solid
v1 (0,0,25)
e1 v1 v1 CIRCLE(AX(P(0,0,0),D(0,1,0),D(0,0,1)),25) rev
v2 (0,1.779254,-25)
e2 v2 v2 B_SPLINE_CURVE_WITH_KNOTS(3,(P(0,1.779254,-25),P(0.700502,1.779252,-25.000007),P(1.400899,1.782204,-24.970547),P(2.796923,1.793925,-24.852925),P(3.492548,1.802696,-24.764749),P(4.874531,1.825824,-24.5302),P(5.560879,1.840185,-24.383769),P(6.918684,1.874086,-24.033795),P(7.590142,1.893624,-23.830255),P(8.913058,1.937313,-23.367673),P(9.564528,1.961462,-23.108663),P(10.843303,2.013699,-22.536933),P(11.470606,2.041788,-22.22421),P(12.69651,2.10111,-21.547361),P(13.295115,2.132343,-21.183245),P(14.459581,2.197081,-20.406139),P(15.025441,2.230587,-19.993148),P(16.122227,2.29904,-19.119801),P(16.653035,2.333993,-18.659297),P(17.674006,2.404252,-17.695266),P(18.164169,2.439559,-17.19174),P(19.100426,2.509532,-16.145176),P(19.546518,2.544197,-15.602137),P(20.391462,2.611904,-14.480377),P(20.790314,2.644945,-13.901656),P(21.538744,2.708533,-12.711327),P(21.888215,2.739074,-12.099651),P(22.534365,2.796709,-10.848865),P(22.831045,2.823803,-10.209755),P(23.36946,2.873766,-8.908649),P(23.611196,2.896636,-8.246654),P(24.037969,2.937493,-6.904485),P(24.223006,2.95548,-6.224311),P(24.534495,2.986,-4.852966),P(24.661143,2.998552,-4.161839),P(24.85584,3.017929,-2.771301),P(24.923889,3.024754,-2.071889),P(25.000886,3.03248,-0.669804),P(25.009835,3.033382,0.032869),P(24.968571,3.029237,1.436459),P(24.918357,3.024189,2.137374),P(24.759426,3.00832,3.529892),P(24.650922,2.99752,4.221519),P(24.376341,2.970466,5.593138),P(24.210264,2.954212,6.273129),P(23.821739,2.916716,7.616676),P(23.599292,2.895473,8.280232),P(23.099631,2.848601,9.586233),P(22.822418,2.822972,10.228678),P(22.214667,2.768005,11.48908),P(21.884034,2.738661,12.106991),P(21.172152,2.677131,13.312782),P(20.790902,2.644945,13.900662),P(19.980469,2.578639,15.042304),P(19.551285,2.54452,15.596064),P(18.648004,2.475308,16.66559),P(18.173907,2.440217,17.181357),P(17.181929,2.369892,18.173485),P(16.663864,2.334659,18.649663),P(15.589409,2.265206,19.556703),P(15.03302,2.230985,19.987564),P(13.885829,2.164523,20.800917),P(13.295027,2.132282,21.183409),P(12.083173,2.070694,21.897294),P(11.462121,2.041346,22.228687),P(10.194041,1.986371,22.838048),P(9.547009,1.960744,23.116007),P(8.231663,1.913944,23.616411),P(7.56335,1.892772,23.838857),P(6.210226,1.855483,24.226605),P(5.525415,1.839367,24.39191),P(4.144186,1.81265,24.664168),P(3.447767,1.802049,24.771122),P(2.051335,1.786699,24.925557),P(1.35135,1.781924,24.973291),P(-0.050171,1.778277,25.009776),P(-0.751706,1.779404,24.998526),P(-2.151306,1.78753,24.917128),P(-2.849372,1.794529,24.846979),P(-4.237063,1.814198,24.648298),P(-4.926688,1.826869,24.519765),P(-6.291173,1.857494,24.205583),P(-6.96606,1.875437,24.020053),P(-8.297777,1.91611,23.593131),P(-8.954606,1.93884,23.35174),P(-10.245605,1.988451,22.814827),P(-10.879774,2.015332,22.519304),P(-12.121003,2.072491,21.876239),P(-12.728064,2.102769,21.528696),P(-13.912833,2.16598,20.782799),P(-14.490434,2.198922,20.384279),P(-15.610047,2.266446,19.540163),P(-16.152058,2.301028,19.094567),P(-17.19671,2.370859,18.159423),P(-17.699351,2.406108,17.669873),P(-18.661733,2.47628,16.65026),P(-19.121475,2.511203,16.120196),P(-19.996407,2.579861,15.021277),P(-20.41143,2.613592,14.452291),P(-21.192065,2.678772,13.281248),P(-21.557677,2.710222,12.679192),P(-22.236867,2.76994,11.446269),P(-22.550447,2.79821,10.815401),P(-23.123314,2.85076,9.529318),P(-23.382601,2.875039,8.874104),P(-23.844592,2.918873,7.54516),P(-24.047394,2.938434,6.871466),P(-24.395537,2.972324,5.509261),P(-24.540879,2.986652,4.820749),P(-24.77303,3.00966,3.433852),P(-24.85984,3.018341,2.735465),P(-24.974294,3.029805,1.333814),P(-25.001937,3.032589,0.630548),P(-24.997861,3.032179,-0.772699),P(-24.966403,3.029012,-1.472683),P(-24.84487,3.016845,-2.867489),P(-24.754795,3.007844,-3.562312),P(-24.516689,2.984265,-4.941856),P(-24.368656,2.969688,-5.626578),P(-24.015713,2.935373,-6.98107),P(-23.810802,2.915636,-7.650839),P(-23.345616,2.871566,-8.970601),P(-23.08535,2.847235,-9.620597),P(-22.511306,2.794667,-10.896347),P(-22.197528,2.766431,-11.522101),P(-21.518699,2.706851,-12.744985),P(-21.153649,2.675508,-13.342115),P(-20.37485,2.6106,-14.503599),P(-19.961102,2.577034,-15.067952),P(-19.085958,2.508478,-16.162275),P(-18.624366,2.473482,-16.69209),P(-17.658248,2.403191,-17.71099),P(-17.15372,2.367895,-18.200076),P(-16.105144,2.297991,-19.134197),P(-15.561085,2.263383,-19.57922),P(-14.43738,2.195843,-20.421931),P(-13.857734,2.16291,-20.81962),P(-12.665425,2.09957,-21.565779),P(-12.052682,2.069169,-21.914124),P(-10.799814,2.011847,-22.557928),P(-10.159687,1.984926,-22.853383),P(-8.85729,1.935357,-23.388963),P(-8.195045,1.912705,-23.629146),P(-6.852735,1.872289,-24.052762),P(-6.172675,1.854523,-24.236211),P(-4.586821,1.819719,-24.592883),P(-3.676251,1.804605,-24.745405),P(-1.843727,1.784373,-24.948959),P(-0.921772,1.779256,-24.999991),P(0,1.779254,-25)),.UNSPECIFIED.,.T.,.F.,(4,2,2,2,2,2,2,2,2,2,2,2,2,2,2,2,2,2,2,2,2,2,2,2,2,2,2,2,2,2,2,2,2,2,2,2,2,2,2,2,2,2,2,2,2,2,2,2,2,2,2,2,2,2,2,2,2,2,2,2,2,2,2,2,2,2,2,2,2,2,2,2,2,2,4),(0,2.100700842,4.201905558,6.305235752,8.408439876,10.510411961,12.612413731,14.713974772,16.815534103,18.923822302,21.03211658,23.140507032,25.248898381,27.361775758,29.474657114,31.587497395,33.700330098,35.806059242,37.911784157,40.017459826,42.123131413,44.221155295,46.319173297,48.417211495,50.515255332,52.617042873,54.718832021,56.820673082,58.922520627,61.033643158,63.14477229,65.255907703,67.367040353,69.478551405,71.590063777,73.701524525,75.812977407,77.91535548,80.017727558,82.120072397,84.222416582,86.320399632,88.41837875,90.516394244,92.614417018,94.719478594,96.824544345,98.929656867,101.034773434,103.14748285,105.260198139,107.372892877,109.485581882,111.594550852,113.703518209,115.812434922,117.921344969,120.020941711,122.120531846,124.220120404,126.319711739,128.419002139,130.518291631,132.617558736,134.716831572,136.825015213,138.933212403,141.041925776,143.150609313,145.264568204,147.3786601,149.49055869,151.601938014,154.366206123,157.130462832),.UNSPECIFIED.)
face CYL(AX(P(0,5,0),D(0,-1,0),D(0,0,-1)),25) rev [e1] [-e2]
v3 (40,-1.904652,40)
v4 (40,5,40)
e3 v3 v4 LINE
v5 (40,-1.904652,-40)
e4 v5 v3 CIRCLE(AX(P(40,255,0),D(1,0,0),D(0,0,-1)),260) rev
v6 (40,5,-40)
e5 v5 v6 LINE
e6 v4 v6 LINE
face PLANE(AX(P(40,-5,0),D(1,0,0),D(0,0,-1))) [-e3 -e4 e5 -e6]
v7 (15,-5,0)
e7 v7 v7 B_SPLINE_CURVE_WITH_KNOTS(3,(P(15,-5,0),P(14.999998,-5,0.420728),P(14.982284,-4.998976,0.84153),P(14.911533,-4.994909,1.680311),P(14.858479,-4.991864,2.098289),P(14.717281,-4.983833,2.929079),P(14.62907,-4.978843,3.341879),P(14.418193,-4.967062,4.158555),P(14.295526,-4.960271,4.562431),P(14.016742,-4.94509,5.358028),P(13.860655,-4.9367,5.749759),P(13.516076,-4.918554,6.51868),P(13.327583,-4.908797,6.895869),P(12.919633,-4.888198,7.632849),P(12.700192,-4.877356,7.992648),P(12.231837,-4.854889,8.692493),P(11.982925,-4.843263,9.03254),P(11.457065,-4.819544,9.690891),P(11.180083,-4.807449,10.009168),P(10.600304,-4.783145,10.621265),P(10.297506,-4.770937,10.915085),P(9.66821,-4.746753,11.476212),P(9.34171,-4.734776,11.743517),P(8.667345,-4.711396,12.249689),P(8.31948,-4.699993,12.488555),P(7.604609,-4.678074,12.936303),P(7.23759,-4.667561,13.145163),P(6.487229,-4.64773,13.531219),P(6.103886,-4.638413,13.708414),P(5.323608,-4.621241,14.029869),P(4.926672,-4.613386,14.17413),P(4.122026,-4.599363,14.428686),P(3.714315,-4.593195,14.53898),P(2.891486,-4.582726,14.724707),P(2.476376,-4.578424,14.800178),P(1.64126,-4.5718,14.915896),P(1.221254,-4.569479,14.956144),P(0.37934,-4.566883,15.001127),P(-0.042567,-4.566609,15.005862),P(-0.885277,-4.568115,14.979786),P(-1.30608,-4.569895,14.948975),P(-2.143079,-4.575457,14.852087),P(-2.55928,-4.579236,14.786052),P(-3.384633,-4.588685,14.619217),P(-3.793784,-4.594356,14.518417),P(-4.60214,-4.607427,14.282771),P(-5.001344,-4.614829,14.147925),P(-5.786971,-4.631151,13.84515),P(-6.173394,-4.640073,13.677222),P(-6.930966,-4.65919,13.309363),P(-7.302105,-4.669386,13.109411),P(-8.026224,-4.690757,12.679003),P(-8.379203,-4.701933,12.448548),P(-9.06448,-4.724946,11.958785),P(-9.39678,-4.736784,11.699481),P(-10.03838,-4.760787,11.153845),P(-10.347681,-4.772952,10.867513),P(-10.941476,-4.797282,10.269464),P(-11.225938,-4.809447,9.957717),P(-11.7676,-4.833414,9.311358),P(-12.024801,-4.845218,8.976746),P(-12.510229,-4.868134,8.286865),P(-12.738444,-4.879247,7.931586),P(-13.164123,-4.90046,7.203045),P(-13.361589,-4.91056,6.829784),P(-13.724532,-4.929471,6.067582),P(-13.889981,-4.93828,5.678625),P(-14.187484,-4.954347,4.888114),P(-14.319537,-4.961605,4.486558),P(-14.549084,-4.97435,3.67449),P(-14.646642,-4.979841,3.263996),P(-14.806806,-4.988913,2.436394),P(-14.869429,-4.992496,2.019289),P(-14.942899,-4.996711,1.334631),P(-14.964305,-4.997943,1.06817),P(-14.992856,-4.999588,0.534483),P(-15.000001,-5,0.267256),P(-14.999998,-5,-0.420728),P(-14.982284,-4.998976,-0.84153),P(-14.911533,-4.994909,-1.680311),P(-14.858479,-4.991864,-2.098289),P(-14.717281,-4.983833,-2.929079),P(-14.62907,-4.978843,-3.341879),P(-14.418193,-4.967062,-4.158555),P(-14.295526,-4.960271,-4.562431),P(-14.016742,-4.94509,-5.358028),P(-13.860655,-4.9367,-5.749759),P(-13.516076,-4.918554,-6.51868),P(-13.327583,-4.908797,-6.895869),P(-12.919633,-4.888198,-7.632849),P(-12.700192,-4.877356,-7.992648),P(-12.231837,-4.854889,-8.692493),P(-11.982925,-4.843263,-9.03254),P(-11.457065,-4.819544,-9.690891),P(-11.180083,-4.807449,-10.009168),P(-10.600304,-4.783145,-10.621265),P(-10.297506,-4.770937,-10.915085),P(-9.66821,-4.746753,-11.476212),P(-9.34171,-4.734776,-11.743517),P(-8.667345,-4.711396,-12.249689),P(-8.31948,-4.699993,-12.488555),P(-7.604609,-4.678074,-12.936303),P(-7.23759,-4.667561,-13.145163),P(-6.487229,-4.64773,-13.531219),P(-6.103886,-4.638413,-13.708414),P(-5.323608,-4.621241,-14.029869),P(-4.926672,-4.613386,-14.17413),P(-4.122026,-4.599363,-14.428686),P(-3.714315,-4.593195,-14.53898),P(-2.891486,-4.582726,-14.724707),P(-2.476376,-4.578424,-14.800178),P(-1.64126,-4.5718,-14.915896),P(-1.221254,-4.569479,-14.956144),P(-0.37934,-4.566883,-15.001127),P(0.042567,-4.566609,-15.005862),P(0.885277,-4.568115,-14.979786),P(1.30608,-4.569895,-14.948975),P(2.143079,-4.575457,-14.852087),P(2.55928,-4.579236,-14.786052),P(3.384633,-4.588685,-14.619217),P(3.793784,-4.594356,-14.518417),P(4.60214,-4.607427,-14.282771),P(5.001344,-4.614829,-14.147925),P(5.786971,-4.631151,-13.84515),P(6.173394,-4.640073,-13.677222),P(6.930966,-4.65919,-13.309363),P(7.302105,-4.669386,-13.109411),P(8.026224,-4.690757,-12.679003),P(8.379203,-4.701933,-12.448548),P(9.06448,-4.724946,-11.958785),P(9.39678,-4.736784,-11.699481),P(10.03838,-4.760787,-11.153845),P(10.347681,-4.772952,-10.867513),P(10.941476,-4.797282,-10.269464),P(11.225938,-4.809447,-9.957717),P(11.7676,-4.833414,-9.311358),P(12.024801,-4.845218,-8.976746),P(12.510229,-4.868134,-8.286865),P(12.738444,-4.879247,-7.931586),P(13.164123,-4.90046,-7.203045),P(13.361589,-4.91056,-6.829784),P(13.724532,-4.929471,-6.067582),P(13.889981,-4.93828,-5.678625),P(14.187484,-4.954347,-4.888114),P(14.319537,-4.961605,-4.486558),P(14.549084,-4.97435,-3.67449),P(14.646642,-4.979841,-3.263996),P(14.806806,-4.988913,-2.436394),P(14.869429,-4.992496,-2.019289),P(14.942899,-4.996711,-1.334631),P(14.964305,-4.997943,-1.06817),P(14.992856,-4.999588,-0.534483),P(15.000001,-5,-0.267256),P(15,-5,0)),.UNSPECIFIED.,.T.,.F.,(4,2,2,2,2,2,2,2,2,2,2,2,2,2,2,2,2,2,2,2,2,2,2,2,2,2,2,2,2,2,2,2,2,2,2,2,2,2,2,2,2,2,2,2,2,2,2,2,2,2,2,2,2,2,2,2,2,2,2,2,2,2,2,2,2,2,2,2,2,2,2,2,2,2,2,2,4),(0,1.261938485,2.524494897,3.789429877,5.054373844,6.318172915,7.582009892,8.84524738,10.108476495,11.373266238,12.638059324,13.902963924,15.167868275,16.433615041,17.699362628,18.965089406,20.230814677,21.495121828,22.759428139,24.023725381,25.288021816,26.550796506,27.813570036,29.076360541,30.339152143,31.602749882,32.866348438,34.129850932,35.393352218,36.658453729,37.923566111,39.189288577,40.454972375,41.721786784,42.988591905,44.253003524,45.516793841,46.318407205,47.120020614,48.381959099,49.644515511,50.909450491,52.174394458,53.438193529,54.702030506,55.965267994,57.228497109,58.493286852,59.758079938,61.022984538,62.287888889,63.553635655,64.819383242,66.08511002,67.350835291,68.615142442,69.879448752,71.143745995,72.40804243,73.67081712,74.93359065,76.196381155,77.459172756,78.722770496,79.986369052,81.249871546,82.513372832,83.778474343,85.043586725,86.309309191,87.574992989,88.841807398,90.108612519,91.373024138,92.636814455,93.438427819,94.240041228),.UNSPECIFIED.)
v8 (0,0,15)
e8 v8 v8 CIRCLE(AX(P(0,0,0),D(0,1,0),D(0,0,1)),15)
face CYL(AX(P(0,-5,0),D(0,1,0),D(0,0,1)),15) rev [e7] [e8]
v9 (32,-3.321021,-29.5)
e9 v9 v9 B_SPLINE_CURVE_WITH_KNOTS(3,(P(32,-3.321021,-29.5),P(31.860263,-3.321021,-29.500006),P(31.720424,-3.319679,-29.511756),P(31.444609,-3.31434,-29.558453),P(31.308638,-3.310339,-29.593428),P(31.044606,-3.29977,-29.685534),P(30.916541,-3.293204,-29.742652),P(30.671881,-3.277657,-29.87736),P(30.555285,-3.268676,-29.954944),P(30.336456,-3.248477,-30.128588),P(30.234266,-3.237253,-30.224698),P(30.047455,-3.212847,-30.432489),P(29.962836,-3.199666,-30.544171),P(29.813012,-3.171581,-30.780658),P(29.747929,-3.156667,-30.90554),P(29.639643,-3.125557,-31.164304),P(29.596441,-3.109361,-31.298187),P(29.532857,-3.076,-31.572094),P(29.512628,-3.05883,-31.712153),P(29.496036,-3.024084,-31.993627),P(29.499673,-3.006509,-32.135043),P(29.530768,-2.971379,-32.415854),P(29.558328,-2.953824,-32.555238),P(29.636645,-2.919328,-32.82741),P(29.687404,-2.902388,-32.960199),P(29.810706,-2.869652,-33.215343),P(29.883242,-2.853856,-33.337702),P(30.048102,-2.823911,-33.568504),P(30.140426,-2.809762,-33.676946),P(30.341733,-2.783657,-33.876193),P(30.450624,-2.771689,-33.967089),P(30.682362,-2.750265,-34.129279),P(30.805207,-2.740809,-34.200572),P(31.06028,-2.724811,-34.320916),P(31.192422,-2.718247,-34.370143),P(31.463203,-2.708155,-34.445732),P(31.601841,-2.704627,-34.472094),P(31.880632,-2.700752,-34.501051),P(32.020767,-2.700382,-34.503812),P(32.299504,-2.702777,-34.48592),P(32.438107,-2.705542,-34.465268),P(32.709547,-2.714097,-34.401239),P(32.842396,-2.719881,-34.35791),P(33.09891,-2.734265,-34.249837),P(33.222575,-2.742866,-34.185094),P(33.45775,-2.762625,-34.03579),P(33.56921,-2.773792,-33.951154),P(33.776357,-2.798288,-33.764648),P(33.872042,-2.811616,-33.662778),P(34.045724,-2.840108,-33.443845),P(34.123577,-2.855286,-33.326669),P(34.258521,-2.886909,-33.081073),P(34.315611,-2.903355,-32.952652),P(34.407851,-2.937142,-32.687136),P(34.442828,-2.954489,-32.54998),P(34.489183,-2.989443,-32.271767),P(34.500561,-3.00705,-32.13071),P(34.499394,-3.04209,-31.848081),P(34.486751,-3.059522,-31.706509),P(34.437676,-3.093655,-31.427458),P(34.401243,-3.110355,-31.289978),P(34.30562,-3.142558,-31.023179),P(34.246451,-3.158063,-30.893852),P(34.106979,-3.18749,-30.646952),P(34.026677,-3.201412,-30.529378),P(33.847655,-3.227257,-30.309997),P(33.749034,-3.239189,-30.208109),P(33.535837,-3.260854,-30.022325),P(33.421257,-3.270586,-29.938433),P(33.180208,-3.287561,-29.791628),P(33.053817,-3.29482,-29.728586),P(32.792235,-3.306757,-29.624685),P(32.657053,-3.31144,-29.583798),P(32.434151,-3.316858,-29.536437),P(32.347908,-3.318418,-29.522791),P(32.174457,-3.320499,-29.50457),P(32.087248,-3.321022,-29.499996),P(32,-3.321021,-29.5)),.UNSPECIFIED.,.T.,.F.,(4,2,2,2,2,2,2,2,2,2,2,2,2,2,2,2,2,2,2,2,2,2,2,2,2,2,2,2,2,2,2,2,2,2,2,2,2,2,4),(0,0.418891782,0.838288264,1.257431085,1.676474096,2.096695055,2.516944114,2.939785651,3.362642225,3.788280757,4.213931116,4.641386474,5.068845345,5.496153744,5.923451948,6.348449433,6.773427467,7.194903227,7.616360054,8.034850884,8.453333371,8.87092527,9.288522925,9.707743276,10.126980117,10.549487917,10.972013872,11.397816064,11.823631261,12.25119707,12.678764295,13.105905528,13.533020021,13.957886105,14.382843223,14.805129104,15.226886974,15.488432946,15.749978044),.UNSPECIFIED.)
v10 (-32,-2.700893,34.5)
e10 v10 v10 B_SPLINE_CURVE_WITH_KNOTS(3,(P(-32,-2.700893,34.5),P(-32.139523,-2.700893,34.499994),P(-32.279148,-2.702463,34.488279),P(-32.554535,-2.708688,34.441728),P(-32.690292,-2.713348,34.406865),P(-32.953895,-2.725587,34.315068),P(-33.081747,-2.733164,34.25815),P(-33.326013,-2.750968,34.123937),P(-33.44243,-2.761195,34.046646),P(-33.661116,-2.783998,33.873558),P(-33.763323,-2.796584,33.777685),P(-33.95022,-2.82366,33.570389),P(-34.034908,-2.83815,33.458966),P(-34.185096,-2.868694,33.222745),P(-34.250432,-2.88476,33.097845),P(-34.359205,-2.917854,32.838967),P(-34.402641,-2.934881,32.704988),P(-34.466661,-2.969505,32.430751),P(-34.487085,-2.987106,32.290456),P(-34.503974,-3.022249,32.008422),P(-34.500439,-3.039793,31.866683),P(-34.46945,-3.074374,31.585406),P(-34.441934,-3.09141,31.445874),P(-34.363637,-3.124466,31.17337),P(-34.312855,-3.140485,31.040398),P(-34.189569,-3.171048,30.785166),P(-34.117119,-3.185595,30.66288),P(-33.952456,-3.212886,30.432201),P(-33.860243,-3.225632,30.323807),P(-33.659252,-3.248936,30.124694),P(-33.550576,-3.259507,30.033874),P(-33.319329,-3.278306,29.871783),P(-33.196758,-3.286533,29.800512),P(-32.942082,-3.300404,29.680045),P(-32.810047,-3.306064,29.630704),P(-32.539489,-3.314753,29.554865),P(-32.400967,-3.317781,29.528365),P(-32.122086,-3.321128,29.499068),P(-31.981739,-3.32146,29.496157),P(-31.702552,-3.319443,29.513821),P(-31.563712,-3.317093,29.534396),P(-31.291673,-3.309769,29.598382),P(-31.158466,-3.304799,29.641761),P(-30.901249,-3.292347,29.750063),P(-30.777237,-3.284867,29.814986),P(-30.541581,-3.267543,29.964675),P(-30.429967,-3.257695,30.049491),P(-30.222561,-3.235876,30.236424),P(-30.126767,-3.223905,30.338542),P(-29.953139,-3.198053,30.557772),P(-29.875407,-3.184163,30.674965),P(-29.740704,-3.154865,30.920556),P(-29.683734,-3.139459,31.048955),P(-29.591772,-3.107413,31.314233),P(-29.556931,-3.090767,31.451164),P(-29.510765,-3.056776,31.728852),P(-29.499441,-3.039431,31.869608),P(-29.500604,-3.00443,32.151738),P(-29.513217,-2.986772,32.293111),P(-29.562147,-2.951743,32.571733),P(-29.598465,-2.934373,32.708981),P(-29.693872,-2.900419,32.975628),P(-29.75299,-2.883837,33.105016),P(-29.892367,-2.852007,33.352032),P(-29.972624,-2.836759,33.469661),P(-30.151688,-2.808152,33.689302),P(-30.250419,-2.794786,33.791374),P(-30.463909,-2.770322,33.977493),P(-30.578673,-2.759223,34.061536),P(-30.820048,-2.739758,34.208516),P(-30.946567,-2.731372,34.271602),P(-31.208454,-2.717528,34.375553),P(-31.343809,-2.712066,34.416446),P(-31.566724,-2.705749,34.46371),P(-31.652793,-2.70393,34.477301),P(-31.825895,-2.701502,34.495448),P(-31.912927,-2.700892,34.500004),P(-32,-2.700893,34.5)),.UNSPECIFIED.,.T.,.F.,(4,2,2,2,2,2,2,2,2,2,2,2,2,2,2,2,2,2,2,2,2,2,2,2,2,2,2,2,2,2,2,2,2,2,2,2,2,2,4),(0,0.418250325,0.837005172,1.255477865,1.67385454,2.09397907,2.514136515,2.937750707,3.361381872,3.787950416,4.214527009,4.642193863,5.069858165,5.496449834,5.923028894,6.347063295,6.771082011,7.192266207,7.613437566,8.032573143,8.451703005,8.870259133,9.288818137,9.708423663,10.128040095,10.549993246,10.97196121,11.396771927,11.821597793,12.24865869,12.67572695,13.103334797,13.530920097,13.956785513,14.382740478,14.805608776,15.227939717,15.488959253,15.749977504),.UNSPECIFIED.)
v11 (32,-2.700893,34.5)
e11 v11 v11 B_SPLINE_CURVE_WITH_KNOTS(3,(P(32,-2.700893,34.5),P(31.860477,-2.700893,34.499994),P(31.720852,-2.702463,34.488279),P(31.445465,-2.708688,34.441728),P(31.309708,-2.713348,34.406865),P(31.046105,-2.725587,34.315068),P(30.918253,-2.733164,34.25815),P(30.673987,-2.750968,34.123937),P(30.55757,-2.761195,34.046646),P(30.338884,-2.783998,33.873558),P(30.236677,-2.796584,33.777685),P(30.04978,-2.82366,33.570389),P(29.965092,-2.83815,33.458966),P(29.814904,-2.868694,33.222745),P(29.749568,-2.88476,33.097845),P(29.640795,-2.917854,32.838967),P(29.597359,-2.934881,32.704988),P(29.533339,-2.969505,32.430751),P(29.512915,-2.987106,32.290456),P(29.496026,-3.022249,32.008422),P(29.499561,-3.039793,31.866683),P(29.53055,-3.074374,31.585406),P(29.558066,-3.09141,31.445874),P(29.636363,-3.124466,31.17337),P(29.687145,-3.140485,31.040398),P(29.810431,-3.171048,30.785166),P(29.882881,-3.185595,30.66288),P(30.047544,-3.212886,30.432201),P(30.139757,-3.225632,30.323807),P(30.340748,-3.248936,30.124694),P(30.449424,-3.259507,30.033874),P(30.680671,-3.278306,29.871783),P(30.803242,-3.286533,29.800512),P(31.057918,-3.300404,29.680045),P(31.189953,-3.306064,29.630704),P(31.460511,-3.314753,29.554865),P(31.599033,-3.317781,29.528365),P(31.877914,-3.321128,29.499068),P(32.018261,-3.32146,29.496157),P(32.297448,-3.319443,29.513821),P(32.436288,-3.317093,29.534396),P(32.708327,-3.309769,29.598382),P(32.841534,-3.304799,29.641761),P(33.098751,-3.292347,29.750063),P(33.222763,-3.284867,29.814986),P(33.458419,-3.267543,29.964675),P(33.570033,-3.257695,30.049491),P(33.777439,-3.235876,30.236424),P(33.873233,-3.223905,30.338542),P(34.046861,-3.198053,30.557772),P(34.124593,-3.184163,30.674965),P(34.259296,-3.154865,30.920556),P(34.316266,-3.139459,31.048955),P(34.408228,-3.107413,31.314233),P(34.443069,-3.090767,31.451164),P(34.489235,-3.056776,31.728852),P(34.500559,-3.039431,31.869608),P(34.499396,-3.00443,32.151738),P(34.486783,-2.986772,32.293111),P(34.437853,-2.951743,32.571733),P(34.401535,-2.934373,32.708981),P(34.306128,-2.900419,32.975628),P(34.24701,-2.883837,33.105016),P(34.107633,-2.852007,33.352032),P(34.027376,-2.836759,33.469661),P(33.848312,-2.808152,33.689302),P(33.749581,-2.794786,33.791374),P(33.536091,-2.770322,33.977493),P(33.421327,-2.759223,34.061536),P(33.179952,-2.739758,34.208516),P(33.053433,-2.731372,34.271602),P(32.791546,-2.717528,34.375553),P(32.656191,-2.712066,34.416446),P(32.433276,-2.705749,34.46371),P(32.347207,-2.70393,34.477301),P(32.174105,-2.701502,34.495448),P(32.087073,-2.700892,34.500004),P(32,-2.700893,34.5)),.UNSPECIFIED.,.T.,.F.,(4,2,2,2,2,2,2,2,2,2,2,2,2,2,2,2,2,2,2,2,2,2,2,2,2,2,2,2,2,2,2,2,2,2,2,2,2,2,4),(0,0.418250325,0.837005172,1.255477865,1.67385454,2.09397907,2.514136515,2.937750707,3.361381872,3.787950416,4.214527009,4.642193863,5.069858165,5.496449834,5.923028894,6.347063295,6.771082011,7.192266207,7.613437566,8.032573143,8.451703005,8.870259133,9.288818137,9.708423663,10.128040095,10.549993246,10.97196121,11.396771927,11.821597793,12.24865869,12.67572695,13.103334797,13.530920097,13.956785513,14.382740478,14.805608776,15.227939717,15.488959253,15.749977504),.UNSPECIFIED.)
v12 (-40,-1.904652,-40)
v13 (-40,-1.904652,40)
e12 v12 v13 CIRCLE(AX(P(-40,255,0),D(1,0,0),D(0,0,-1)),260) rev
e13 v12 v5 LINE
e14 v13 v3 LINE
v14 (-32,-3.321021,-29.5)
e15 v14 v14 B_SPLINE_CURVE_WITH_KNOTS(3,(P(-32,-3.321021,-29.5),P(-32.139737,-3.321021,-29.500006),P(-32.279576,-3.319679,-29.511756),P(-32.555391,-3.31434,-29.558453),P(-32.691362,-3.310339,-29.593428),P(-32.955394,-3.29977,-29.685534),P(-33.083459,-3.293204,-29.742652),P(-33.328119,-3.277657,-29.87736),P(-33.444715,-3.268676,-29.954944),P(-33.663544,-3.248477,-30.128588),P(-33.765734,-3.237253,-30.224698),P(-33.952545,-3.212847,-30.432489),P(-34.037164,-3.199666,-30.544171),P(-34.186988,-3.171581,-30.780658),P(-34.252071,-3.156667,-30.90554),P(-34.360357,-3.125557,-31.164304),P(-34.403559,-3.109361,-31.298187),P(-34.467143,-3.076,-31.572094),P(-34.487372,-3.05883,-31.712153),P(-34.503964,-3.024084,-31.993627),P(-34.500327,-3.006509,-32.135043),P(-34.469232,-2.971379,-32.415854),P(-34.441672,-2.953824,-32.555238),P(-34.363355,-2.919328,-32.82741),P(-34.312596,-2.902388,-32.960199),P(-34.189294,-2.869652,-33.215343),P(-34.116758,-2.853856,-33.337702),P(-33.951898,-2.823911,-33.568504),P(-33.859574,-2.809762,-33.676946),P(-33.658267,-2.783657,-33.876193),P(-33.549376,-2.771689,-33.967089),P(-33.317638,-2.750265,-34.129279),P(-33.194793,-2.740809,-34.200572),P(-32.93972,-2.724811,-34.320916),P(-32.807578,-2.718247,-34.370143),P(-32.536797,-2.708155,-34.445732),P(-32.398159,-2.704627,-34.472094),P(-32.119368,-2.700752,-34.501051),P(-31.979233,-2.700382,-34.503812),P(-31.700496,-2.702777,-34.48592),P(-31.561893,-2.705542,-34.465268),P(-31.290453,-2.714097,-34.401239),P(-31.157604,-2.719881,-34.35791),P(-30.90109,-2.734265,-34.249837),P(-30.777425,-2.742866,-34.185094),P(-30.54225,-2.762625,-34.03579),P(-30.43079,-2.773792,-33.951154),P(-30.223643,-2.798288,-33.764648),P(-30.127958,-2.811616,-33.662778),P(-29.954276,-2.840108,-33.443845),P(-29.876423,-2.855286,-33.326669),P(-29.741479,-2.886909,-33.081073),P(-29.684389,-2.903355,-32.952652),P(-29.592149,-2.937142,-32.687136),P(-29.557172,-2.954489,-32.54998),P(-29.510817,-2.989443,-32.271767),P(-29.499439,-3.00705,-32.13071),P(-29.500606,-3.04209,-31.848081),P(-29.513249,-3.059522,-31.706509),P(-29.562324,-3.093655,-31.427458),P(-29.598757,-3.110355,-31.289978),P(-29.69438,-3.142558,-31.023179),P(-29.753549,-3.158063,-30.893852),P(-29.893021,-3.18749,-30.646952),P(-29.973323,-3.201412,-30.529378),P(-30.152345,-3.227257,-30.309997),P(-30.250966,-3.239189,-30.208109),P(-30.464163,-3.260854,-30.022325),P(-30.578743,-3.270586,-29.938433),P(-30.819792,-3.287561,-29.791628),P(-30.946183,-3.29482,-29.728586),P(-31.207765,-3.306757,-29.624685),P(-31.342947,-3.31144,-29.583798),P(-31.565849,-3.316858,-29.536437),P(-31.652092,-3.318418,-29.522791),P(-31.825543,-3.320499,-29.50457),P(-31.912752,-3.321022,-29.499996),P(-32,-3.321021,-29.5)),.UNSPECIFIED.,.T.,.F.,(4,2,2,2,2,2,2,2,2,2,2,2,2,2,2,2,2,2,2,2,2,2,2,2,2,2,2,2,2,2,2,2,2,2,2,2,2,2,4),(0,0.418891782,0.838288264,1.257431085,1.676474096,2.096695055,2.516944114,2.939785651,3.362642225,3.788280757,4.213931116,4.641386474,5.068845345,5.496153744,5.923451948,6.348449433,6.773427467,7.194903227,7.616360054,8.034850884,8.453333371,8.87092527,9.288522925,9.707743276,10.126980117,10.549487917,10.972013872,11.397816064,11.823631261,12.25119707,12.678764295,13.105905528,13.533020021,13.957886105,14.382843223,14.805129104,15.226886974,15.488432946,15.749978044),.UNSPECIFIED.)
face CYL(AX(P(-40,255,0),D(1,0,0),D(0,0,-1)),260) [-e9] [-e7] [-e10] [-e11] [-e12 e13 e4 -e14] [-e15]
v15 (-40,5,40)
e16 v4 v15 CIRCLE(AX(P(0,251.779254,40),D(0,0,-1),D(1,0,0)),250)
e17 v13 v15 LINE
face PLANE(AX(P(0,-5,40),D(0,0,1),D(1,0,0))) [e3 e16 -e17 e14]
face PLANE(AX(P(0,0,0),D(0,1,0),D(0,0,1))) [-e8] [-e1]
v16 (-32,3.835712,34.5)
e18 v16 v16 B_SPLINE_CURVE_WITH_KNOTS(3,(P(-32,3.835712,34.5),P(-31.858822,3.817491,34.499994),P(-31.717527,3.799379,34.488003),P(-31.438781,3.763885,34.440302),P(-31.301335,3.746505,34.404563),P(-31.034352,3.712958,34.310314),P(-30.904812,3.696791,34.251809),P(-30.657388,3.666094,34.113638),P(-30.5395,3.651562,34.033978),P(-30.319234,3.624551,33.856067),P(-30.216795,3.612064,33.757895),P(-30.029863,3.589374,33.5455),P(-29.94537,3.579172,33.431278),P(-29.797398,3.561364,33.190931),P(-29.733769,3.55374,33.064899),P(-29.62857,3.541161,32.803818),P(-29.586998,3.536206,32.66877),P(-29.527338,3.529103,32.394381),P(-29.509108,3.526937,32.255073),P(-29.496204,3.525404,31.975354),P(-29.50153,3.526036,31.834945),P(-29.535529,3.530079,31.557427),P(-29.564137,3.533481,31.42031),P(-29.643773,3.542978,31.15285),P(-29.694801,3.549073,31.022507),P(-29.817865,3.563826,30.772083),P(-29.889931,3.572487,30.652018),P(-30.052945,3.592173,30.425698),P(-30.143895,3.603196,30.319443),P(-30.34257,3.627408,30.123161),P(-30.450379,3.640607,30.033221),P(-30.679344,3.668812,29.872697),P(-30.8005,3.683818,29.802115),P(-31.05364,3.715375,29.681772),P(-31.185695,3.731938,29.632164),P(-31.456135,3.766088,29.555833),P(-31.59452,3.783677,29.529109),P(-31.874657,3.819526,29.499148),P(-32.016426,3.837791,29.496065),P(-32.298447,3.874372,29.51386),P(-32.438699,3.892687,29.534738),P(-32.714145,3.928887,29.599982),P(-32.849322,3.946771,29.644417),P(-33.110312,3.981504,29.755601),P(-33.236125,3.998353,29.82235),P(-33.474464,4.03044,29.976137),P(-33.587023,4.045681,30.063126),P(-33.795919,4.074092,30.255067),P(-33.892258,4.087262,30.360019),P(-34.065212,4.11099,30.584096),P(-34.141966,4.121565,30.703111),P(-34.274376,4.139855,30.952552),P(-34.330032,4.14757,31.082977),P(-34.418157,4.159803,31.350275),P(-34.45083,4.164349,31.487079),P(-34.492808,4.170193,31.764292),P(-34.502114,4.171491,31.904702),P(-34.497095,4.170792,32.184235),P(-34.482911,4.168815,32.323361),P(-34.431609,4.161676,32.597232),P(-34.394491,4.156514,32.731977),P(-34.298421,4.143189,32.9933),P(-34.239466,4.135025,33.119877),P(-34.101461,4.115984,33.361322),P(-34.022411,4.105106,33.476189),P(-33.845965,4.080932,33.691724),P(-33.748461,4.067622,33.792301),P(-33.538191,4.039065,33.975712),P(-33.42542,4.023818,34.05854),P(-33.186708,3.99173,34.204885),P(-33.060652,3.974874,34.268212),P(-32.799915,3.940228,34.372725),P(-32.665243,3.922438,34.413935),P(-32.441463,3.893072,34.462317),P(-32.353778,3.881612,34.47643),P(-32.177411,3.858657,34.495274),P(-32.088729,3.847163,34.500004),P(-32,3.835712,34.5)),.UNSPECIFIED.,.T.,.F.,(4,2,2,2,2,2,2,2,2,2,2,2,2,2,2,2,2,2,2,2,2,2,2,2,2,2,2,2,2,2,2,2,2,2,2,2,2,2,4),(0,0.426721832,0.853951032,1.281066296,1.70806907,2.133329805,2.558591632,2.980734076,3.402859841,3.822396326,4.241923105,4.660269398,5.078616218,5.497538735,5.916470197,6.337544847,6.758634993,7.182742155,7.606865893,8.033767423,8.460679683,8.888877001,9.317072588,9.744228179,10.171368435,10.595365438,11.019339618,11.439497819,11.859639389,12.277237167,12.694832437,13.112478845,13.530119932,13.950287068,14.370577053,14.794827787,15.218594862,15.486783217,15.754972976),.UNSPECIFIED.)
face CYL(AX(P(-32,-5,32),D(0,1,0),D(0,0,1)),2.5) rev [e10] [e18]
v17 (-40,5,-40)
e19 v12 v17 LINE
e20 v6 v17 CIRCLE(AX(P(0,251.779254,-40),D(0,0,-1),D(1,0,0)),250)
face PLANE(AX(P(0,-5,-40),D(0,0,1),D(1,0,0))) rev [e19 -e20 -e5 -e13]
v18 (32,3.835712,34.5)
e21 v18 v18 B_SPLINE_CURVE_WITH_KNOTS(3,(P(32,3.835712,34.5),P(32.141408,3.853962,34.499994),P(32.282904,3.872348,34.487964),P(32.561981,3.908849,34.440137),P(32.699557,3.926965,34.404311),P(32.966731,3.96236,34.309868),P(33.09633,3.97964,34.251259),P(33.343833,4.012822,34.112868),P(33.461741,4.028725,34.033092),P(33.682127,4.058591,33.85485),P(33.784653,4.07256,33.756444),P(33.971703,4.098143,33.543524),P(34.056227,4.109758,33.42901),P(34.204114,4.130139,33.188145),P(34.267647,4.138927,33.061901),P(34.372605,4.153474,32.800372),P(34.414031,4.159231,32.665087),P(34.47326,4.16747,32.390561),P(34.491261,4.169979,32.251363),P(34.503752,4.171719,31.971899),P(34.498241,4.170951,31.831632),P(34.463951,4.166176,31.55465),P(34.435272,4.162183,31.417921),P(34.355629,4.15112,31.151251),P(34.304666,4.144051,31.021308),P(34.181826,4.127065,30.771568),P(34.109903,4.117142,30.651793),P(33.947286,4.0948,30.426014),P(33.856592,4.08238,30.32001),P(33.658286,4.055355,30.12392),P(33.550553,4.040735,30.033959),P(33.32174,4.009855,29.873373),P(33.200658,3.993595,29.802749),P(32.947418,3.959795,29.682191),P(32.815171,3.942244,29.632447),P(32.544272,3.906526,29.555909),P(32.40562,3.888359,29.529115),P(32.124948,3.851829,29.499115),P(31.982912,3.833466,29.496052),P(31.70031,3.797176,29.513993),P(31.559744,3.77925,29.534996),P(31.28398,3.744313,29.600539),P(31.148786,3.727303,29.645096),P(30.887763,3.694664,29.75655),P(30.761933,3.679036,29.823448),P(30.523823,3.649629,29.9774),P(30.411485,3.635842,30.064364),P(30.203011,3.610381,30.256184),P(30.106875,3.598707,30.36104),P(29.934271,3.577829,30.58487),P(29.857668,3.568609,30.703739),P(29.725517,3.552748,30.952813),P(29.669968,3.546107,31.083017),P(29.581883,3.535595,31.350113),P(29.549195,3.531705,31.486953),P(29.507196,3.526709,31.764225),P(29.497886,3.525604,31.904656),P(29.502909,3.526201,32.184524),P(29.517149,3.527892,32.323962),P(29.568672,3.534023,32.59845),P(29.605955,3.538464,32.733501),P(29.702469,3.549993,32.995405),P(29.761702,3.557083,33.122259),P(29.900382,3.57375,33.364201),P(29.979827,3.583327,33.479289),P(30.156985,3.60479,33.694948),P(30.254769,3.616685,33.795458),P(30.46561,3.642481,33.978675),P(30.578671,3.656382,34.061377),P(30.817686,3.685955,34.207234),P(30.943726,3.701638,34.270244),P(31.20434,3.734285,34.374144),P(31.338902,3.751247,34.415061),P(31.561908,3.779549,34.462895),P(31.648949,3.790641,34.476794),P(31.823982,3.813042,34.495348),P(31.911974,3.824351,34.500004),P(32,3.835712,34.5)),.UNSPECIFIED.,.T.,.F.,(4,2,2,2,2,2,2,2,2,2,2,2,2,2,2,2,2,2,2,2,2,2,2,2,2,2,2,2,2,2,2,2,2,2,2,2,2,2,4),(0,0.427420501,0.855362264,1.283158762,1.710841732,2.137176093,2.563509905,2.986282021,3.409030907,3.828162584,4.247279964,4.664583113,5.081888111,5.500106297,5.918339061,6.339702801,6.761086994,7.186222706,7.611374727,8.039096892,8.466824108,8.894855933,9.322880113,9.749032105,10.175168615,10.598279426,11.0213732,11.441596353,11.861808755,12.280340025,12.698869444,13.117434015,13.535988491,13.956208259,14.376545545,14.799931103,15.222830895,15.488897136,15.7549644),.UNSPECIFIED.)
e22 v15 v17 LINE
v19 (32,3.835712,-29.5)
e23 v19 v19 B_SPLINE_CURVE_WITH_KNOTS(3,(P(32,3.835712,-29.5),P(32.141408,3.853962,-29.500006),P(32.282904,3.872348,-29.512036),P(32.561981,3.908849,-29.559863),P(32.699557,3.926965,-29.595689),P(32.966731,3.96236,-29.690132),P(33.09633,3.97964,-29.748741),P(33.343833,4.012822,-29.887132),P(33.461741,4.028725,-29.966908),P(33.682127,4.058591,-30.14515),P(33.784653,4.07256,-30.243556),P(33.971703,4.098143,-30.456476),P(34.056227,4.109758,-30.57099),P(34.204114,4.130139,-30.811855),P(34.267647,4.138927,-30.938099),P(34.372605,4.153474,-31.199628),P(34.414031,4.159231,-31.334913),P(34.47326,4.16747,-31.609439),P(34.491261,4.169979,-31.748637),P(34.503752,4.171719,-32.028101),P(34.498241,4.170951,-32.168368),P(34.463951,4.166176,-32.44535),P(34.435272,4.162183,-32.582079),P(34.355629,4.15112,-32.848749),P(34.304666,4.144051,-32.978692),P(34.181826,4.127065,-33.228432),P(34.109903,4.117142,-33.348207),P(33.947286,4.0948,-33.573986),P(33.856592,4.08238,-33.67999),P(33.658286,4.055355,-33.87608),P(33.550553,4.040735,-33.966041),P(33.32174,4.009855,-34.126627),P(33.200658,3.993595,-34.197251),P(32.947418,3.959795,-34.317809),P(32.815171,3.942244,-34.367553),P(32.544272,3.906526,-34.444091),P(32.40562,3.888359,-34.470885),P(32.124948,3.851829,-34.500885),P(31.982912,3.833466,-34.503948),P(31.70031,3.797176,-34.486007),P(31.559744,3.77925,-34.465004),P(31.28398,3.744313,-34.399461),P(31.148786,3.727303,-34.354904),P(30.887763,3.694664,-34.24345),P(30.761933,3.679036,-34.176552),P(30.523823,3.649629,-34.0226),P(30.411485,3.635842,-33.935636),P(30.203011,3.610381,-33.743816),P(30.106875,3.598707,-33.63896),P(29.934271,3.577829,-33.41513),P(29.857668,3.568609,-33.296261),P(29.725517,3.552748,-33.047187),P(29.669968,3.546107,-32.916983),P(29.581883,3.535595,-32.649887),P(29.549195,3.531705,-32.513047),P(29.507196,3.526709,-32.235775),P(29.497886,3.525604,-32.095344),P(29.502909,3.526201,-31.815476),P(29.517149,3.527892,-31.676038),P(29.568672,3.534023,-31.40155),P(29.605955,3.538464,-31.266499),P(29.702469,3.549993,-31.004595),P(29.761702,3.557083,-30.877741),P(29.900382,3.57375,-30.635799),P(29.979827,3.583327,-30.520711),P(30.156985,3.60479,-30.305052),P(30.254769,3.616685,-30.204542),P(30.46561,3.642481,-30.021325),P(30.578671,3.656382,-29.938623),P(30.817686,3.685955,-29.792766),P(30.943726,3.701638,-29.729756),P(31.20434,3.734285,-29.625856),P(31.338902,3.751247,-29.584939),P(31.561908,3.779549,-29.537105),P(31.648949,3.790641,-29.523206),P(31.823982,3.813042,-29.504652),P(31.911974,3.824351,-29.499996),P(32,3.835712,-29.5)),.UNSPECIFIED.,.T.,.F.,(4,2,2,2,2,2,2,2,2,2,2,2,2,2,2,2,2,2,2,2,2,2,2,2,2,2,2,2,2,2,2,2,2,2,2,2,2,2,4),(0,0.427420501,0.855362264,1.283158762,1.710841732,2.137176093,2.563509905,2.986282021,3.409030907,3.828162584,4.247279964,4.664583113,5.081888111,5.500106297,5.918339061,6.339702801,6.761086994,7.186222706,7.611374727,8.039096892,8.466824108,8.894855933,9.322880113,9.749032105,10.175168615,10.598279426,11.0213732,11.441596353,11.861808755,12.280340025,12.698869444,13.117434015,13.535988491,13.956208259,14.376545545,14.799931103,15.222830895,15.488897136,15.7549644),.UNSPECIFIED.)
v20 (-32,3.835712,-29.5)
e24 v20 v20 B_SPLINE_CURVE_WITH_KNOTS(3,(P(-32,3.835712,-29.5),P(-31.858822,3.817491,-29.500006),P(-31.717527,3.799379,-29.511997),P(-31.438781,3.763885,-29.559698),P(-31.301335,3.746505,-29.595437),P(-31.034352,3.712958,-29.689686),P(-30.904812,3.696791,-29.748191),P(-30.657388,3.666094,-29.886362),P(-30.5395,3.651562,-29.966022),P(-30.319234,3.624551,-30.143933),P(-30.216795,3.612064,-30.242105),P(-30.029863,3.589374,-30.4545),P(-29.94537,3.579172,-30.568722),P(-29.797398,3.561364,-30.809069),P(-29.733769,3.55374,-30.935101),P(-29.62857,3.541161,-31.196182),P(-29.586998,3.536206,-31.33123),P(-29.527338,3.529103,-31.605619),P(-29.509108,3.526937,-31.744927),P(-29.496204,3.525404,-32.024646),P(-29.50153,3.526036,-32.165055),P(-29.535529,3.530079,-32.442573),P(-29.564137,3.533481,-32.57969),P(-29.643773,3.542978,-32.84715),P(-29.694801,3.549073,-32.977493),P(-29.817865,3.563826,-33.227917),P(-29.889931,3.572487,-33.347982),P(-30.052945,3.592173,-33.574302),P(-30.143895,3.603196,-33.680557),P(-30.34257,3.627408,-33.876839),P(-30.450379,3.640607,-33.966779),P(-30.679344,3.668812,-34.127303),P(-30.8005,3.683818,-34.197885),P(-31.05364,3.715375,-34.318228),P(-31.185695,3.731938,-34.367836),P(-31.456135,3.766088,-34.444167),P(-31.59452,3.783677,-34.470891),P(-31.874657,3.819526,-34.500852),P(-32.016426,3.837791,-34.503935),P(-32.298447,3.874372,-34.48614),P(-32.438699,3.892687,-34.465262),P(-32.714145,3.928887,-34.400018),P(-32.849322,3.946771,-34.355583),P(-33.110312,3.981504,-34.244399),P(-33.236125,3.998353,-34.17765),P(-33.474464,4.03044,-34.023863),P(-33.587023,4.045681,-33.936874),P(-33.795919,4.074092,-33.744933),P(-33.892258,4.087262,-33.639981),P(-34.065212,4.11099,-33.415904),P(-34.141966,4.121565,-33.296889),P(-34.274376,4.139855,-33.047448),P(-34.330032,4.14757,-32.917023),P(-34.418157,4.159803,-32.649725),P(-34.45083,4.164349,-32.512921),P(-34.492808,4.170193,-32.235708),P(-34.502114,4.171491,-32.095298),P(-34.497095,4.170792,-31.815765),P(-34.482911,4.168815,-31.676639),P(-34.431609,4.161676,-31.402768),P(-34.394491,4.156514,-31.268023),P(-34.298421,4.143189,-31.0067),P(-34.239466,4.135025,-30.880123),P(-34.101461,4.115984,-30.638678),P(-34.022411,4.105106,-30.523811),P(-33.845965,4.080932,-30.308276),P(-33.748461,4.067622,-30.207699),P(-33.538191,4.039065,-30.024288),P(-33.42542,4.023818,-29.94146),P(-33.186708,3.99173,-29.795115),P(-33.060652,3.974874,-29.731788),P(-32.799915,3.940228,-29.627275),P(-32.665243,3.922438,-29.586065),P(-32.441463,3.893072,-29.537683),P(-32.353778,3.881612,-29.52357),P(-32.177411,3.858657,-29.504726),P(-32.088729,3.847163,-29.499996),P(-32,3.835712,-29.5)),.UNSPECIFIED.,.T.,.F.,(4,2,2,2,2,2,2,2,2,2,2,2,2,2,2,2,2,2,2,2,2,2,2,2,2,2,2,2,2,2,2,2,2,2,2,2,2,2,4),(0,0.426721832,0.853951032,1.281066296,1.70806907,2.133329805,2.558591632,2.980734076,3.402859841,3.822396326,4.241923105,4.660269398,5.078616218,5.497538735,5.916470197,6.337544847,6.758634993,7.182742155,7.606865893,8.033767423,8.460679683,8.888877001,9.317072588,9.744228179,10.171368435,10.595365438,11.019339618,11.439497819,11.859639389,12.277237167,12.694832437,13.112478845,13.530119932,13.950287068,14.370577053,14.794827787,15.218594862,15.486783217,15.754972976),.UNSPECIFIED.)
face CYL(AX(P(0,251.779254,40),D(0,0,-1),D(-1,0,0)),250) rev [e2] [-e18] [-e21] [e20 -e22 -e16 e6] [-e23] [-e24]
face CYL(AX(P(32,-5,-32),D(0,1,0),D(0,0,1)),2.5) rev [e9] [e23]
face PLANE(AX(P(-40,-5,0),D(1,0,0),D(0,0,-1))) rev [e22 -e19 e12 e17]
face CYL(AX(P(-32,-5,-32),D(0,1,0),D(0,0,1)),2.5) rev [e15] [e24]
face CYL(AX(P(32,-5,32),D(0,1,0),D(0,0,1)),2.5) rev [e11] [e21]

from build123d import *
from build123d.topology import SkipClean

# Parameters (mm, degrees)
SKETCH1_3_W         = 80
SKETCH1_3_H         = 80
SKETCH1_3_R         = 2.5
SKETCH1_3_R_2       = 15
BOSS_EXTRUDE3_DEPTH = 5
BOSS_EXTRUDE4_START = 5
SKETCH1_W           = 80
SKETCH1_H           = 80
SKETCH1_R           = 2.5
SKETCH1_R_2         = 25
BOSS_EXTRUDE4_DEPTH = 5
CUT_EXTRUDE1_DEPTH  = 90.582364336
CUT_EXTRUDE2_DEPTH  = 90.582364475
CUT_EXTRUDE3_DEPTH  = 90.582364475


with BuildPart() as part:
    # Sketch1<3> → Boss-Extrude3 (new body)
    with BuildSketch(Plane(origin=(0, 0, 0), x_dir=(1, 0, 0), z_dir=(0, 1, 0))):
        Rectangle(SKETCH1_3_W, SKETCH1_3_H)
        with Locations((-32, -32)):
            Circle(SKETCH1_3_R, mode=Mode.SUBTRACT)
        with Locations((32, -32)):
            Circle(SKETCH1_3_R, mode=Mode.SUBTRACT)
        with Locations((-32, 32)):
            Circle(SKETCH1_3_R, mode=Mode.SUBTRACT)
        with Locations((32, 32)):
            Circle(SKETCH1_3_R, mode=Mode.SUBTRACT)
        Circle(SKETCH1_3_R_2, mode=Mode.SUBTRACT)
    extrude(amount=-BOSS_EXTRUDE3_DEPTH)

    # Sketch1 → Boss-Extrude4 (add)
    with BuildSketch(Plane(origin=(0, 0, 0), x_dir=(1, 0, 0), z_dir=(0, 1, 0)).offset(BOSS_EXTRUDE4_START)):
        Rectangle(SKETCH1_W, SKETCH1_H)
        with Locations((-32, -32)):
            Circle(SKETCH1_R, mode=Mode.SUBTRACT)
        with Locations((32, -32)):
            Circle(SKETCH1_R, mode=Mode.SUBTRACT)
        Circle(SKETCH1_R_2, mode=Mode.SUBTRACT)
        with Locations((-32, 32)):
            Circle(SKETCH1_R, mode=Mode.SUBTRACT)
        with Locations((32, 32)):
            Circle(SKETCH1_R, mode=Mode.SUBTRACT)
    extrude(amount=-BOSS_EXTRUDE4_DEPTH)

    # Sketch5 → Cut-Extrude1 (cut, through all)
    with BuildSketch(Plane(origin=(0, 0, -40), x_dir=(-1, 0, 0), z_dir=(0, 0, -1))):
        with BuildLine():
            Line((40, 5), (-40, 5))
            ThreePointArc((-40, 5), (0, 1.779253585), (40, 5))
        make_face()
    extrude(amount=-CUT_EXTRUDE1_DEPTH, mode=Mode.SUBTRACT)

    # Sketch7 → Cut-Extrude2 (cut, through all)
    with BuildSketch(Plane(origin=(40, 0, 0), x_dir=(0, 0, -1), z_dir=(1, 0, 0))):
        with BuildLine():
            ThreePointArc((0, -5), (-20.059793007, -4.225007869), (-40, -1.904651573))
            Line((-40, -1.904651573), (-40, -5))
            Line((-40, -5), (0, -5))
        make_face()
    extrude(amount=-CUT_EXTRUDE2_DEPTH, mode=Mode.SUBTRACT)

    # Sketch7<3> → Cut-Extrude3 (cut, through all)
    with SkipClean():  # the faces are left unmerged after this step: merging them gives an invalid solid
        with BuildSketch(Plane(origin=(40, 0, 0), x_dir=(0, 0, -1), z_dir=(1, 0, 0))):
            with BuildLine():
                ThreePointArc((40, -1.904651573), (20.059793007, -4.225007869), (0, -5))
                Line((0, -5), (40, -5))
                Line((40, -5), (40, -1.904651573))
            make_face()
        extrude(amount=-CUT_EXTRUDE3_DEPTH, mode=Mode.SUBTRACT)


solid = part.part
